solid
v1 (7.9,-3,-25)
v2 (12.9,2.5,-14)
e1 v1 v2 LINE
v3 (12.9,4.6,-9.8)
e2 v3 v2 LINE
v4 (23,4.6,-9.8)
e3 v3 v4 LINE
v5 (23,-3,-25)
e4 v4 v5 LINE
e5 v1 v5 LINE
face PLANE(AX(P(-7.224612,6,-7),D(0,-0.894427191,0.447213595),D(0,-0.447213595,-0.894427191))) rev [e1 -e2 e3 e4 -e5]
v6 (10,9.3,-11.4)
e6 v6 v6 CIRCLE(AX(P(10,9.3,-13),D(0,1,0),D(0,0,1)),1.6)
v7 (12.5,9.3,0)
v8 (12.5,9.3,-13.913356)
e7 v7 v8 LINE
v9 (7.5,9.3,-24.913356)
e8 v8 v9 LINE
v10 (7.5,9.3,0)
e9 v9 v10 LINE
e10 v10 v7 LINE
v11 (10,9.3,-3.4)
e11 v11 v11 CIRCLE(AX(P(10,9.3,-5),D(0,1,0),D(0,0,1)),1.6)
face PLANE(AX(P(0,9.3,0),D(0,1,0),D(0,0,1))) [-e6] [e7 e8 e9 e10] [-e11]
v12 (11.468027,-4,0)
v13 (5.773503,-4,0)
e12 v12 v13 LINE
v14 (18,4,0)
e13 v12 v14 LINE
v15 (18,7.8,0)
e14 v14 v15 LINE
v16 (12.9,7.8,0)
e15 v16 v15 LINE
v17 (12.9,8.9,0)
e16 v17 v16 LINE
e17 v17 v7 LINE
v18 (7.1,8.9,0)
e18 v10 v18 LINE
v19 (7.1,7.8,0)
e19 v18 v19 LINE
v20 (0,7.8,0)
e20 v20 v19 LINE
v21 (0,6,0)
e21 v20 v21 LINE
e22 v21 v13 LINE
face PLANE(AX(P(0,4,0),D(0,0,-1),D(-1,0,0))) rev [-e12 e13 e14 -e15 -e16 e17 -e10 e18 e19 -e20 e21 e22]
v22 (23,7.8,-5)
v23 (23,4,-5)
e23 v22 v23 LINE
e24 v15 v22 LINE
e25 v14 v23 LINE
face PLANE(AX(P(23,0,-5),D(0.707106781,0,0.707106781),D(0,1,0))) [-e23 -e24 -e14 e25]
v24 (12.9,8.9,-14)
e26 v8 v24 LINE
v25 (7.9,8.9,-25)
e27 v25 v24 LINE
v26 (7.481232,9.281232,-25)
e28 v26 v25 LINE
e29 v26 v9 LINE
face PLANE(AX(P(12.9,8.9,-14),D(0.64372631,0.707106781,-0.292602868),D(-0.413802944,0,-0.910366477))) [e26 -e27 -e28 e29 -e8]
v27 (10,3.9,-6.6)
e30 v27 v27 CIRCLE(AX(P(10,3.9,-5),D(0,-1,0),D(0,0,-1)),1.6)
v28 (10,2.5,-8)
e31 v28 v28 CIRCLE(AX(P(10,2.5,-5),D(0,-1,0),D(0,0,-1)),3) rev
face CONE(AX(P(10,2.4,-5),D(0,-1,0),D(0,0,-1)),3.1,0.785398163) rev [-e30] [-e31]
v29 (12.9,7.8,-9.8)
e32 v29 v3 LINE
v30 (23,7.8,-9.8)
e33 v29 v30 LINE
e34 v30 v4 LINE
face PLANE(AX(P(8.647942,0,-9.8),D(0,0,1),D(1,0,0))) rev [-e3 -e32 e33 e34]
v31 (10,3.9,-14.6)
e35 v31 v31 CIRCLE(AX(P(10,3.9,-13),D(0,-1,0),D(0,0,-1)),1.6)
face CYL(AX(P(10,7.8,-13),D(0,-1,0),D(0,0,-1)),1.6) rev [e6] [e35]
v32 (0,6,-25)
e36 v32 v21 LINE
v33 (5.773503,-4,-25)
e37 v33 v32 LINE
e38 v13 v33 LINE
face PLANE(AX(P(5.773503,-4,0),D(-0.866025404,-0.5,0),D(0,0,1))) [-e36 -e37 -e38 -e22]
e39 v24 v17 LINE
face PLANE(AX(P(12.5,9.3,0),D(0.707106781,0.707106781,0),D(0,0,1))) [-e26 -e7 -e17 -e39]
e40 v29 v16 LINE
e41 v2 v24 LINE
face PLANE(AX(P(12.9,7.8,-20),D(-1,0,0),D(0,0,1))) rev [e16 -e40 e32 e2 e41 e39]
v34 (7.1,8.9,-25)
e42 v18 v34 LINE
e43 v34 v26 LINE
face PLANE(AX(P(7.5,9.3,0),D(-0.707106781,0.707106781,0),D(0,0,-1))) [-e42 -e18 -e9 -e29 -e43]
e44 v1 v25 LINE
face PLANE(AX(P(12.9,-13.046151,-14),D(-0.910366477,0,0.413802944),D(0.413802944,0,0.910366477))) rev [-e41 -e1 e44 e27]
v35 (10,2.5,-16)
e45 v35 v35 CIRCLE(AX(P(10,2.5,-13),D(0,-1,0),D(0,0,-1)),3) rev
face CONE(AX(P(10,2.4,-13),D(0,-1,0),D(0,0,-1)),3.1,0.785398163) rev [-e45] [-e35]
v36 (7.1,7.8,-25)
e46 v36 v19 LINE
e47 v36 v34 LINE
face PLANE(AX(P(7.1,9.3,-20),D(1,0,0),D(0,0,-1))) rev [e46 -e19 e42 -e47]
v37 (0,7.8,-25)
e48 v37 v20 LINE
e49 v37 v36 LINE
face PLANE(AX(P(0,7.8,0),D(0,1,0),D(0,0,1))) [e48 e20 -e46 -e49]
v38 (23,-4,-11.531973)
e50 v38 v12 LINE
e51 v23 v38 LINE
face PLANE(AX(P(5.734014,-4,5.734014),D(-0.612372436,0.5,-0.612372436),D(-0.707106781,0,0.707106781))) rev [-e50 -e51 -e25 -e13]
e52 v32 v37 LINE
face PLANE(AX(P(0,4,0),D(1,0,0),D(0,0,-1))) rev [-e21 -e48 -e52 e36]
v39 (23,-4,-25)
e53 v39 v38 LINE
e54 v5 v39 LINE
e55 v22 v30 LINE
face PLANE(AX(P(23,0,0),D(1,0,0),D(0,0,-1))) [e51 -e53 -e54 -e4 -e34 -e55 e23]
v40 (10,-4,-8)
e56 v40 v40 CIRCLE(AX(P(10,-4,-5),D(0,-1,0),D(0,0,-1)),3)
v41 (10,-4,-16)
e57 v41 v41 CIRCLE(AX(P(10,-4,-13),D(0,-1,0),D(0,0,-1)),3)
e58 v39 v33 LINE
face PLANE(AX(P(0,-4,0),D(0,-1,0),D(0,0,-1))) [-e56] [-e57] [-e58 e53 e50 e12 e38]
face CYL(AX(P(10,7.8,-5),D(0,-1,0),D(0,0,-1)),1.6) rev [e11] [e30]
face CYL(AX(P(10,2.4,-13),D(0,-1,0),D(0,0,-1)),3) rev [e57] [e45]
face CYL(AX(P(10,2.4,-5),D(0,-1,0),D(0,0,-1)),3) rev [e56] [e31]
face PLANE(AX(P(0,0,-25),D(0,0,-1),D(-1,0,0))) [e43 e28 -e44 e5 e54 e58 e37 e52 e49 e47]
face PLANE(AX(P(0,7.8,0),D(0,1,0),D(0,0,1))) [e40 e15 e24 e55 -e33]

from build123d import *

# Parameters (mm, degrees)
SKETCH_1_W           = 20
SKETCH_1_H           = 20
EXTRUDE_1_DEPTH      = 4
SKETCH_2_W           = 12.9
SKETCH_2_H           = 20
EXTRUDE_2_DEPTH      = 3.8
SKETCH_3_R           = 1.6
CUT_EXTRUDE_1_DEPTH  = 30.340074983
SKETCH_4_W           = 5.8
SKETCH_4_H           = 20
SKETCH_4_R           = 1.6
EXTRUDE_3_DEPTH      = 1.5
SKETCH_5_R           = 3
CUT_EXTRUDE_3_DEPTH  = 2.4
SKETCH_6_W           = 20
SKETCH_6_H           = 4
EXTRUDE_4_DEPTH      = 3
EXTRUDE_START        = 4
SKETCH_7_W           = 23
SKETCH_7_H           = 20
SKETCH_7_R           = 3
EXTRUDE_5_DEPTH      = 4
SKETCH_9_W           = 10.1
SKETCH_9_H           = 20
EXTRUDE_6_DEPTH      = 2
EXTRUDE_7_DEPTH      = 5
CHAMFER_7_SIZE       = 10
CHAMFER_7_SIZE2      = 5.773502692
CHAMFER_8_SIZE       = 5
CHAMFER_9_SIZE       = 8
CHAMFER_9_SIZE2      = 4.618802154
CUT_EXTRUDE_9_DEPTH  = 10.1
CUT_EXTRUDE_10_REACH = 38.481
CHAMFER_10_SIZE      = 1.5
CHAMFER_11_SIZE      = 0.4
EXTRUDE_8_DEPTH      = 1.8
EXTRUDE_10_DEPTH     = 10.1


with BuildPart() as part:
    # 草图1 → 凸台-拉伸1 (new body)
    with BuildSketch(Plane(origin=(0, 0, 0), x_dir=(1, 0, 0), z_dir=(0, 1, 0))):
        with Locations((10, 10)):
            Rectangle(SKETCH_1_W, SKETCH_1_H)
    extrude(amount=EXTRUDE_1_DEPTH)

    # 草图2 → 凸台-拉伸2 (add)
    with BuildSketch(Plane(origin=(0, 4, 0), x_dir=(1, 0, 0), z_dir=(0, 1, 0))):
        with Locations((6.45, 10)):
            Rectangle(SKETCH_2_W, SKETCH_2_H)
    extrude(amount=EXTRUDE_2_DEPTH)

    # 草图3 → 切除-拉伸1 (cut, through all)
    with BuildSketch(Plane(origin=(0, 0, 0), x_dir=(-1, 0, 0), z_dir=(0, -1, 0))):
        with Locations(Location((-10, 5, 0), (0, 0, 90))):
            Circle(SKETCH_3_R)
        with Locations(Location((-10, 13, 0), (0, 0, 90))):
            Circle(SKETCH_3_R)
    extrude(amount=-CUT_EXTRUDE_1_DEPTH, mode=Mode.SUBTRACT)

    # 草图4 → 凸台-拉伸3 (add)
    with BuildSketch(Plane(origin=(0, 7.8, 0), x_dir=(1, 0, 0), z_dir=(0, 1, 0))):
        with Locations((10, 10)):
            Rectangle(SKETCH_4_W, SKETCH_4_H)
        with Locations(Location((10, 13, 0), (0, 0, 90))):
            Circle(SKETCH_4_R, mode=Mode.SUBTRACT)
        with Locations(Location((10, 5, 0), (0, 0, 90))):
            Circle(SKETCH_4_R, mode=Mode.SUBTRACT)
    extrude(amount=EXTRUDE_3_DEPTH)

    # 草图5 → 切除-拉伸3 (cut)
    with BuildSketch(Plane(origin=(0, 0, 0), x_dir=(-1, 0, 0), z_dir=(0, -1, 0))):
        with Locations(Location((-10, 5, 0), (0, 0, 90))):
            Circle(SKETCH_5_R)
        with Locations(Location((-10, 13, 0), (0, 0, 90))):
            Circle(SKETCH_5_R)
    extrude(amount=-CUT_EXTRUDE_3_DEPTH, mode=Mode.SUBTRACT)

    # 草图6 → 凸台-拉伸4 (add)
    with BuildSketch(Plane(origin=(20, 0, 0), x_dir=(0, 0, -1), z_dir=(1, 0, 0))):
        with Locations((10, 2)):
            Rectangle(SKETCH_6_W, SKETCH_6_H)
    extrude(amount=EXTRUDE_4_DEPTH)

    # 草图7 → 凸台-拉伸5 (add)
    with BuildSketch(Plane(origin=(0, 0, 0), x_dir=(-1, 0, 0), z_dir=(0, -1, 0)).offset(EXTRUDE_START)):
        with Locations((-11.5, 10)):
            Rectangle(SKETCH_7_W, SKETCH_7_H)
        with Locations(Location((-10, 13, 0), (0, 0, 90))):
            Circle(SKETCH_7_R, mode=Mode.SUBTRACT)
        with Locations(Location((-10, 5, 0), (0, 0, 90))):
            Circle(SKETCH_7_R, mode=Mode.SUBTRACT)
    extrude(amount=-EXTRUDE_5_DEPTH)

    # 草图9 → 凸台-拉伸6 (add)
    with BuildSketch(Plane(origin=(0, 4, 0), x_dir=(1, 0, 0), z_dir=(0, 1, 0))):
        with Locations((17.95, 10)):
            Rectangle(SKETCH_9_W, SKETCH_9_H)
    extrude(amount=EXTRUDE_6_DEPTH)

    # 草图11 → 凸台-拉伸7 (add)
    with BuildSketch(Plane(origin=(0, 0, -20), x_dir=(-1, 0, 0), z_dir=(0, 0, -1))):
        Polygon((-23, 6), (-23, -4), (0, -4), (0, 7.8), (-7.1, 7.8), (-7.1, 9.3), (-12.9, 9.3), (-12.9, 6), align=None)
    extrude(amount=EXTRUDE_7_DEPTH)

    # 倒角7
    chamfer_7_edges = [part.edges().sort_by_distance(p)[0] for p in [
        (0, -4, -12.5),
    ]]
    chamfer_7_side = [part.faces().sort_by_distance(p)[0] for p in [
        (0, 1.9, -12.5),
    ]]
    chamfer(chamfer_7_edges, length=CHAMFER_7_SIZE, length2=CHAMFER_7_SIZE2, reference=chamfer_7_side[0])

    # 倒角8
    chamfer_8_edges = [part.edges().sort_by_distance(p)[0] for p in [
        (23, 1, 0),
    ]]
    chamfer(chamfer_8_edges, length=CHAMFER_8_SIZE)

    # 倒角9
    chamfer_9_edges = [part.edges().sort_by_distance(p)[0] for p in [
        (20.5, -4, -2.5),
    ]]
    chamfer_9_side = [part.faces().sort_by_distance(p)[0] for p in [
        (20.5, 1, -2.5),
    ]]
    chamfer(chamfer_9_edges, length=CHAMFER_9_SIZE, length2=CHAMFER_9_SIZE2, reference=chamfer_9_side[0])

    # 草图15 → 切除-拉伸9 (cut)
    with BuildSketch(Plane(origin=(23, 0, 0), x_dir=(0, 0, -1), z_dir=(1, 0, 0))):
        Polygon((25, -3), (25, 6), (7, 6), align=None)
    extrude(amount=-CUT_EXTRUDE_9_DEPTH, mode=Mode.SUBTRACT)

    # 切除-拉伸10: up to this plane
    cut_extrude_10_end = Plane(origin=(-7.224611797, 6, -7), z_dir=(0, -0.894427190999916, 0.447213595499958))
    # 草图16 → 切除-拉伸10 (cut, up to the surface)
    with BuildSketch(Plane(origin=(0, 9.3, 0), x_dir=(1, 0, 0), z_dir=(0, 1, 0)), mode=Mode.PRIVATE) as cut_extrude_10_sk1:
        Polygon((7.9, 25), (12.9, 25), (12.9, 14), align=None)
    cut_extrude_10_tool1 = split(extrude(cut_extrude_10_sk1.sketch, amount=-CUT_EXTRUDE_10_REACH, mode=Mode.PRIVATE), bisect_by=cut_extrude_10_end, keep=Keep.BOTH, mode=Mode.PRIVATE)
    add(cut_extrude_10_tool1.solids().sort_by_distance((11.233333, 9.3, -21.333333))[0], mode=Mode.SUBTRACT)

    # 倒角10
    # the kernel refuses this chamfer: 1.5 mm, written as the material it takes off along each edge
    with BuildSketch(Plane(origin=(10, 2.4, -13), x_dir=(0, 0, -1), z_dir=(-1, 0, 0))) as chamfer_10_piece_1_section:
        Polygon((1.6, -CHAMFER_10_SIZE), (1.6 + CHAMFER_10_SIZE, 0), (1.6, 0), align=None)
    chamfer_10_piece_1 = revolve(axis=Axis((10, 2.4, -13), (0, -1, 0)), mode=Mode.PRIVATE)
    chamfer_10_piece_1 = chamfer_10_piece_1 & Plane(origin=(10, 3.20338318, -13), x_dir=(0, 0, -1), z_dir=(0, -1, 0)) * Cylinder(3, 13, mode=Mode.PRIVATE)
    add(chamfer_10_piece_1, mode=Mode.SUBTRACT)
    with BuildSketch(Plane(origin=(10, 2.4, -5), x_dir=(0, 0, -1), z_dir=(-1, 0, 0))) as chamfer_10_piece_2_section:
        Polygon((1.6, -CHAMFER_10_SIZE), (1.6 + CHAMFER_10_SIZE, 0), (1.6, 0), align=None)
    chamfer_10_piece_2 = revolve(axis=Axis((10, 2.4, -5), (0, -1, 0)), mode=Mode.PRIVATE)
    chamfer_10_piece_2 = chamfer_10_piece_2 & Plane(origin=(10, 3.20338318, -5), x_dir=(0, 0, -1), z_dir=(0, -1, 0)) * Cylinder(3, 13, mode=Mode.PRIVATE)
    add(chamfer_10_piece_2, mode=Mode.SUBTRACT)

    # 倒角11
    # the kernel refuses this chamfer: 0.4 mm, written as the material it takes off along each edge
    with BuildSketch(Plane(origin=(13.325667997, 9.3, -13.063530407), x_dir=(-0.9100222832929536, 0.027495876610587288, 0.4136464924058883), z_dir=(-0.4138029443011842, 0, -0.9103664774626047))) as chamfer_11_piece_1:
        Polygon((CHAMFER_11_SIZE * 0.999621916911, -CHAMFER_11_SIZE * 0.0274958766106), (-CHAMFER_11_SIZE * 0.0274958766106, -CHAMFER_11_SIZE * 0.999621916911), (0, 0), align=None)
    extrude(amount=14.140392364, mode=Mode.SUBTRACT)
    with BuildSketch(Plane(origin=(12.9, 9.3, 1.028673195), x_dir=(-0.9996219169112966, 0.027495876610587302, 0), z_dir=(0, 0, -1))) as chamfer_11_piece_2:
        Polygon((CHAMFER_11_SIZE * 0.999621916911, -CHAMFER_11_SIZE * 0.0274958766106), (-CHAMFER_11_SIZE * 0.0274958766106, -CHAMFER_11_SIZE * 0.999621916911), (0, 0), align=None)
    extrude(amount=16.05734639, mode=Mode.SUBTRACT)
    with BuildSketch(Plane(origin=(7.1, 9.3, 1.028673195), x_dir=(0.9996219169112966, 0.027495876610587302, 0), z_dir=(0, 0, -1))) as chamfer_11_piece_3:
        Polygon((CHAMFER_11_SIZE * 0.999621916911, CHAMFER_11_SIZE * 0.0274958766106), (-CHAMFER_11_SIZE * 0.0274958766106, CHAMFER_11_SIZE * 0.999621916911), (0, 0), align=None)
    extrude(amount=27.05734639, mode=Mode.SUBTRACT)

    # 草图17 → 凸台-拉伸8 (add)
    with BuildSketch(Plane(origin=(0, 6, 0), x_dir=(1, 0, 0), z_dir=(0, 1, 0))):
        Polygon((23, 5), (23, 7), (12.9, 7), (12.9, 0), (18, 0), align=None)
    extrude(amount=EXTRUDE_8_DEPTH)

    # 草图19 → 凸台-拉伸10 (add)
    with BuildSketch(Plane(origin=(23, 0, 0), x_dir=(0, 0, -1), z_dir=(1, 0, 0))):
        Polygon((9.8, 7.8), (7, 7.8), (7, 6), (9.8, 4.6), align=None)
    extrude(amount=-EXTRUDE_10_DEPTH)


solid = part.part
